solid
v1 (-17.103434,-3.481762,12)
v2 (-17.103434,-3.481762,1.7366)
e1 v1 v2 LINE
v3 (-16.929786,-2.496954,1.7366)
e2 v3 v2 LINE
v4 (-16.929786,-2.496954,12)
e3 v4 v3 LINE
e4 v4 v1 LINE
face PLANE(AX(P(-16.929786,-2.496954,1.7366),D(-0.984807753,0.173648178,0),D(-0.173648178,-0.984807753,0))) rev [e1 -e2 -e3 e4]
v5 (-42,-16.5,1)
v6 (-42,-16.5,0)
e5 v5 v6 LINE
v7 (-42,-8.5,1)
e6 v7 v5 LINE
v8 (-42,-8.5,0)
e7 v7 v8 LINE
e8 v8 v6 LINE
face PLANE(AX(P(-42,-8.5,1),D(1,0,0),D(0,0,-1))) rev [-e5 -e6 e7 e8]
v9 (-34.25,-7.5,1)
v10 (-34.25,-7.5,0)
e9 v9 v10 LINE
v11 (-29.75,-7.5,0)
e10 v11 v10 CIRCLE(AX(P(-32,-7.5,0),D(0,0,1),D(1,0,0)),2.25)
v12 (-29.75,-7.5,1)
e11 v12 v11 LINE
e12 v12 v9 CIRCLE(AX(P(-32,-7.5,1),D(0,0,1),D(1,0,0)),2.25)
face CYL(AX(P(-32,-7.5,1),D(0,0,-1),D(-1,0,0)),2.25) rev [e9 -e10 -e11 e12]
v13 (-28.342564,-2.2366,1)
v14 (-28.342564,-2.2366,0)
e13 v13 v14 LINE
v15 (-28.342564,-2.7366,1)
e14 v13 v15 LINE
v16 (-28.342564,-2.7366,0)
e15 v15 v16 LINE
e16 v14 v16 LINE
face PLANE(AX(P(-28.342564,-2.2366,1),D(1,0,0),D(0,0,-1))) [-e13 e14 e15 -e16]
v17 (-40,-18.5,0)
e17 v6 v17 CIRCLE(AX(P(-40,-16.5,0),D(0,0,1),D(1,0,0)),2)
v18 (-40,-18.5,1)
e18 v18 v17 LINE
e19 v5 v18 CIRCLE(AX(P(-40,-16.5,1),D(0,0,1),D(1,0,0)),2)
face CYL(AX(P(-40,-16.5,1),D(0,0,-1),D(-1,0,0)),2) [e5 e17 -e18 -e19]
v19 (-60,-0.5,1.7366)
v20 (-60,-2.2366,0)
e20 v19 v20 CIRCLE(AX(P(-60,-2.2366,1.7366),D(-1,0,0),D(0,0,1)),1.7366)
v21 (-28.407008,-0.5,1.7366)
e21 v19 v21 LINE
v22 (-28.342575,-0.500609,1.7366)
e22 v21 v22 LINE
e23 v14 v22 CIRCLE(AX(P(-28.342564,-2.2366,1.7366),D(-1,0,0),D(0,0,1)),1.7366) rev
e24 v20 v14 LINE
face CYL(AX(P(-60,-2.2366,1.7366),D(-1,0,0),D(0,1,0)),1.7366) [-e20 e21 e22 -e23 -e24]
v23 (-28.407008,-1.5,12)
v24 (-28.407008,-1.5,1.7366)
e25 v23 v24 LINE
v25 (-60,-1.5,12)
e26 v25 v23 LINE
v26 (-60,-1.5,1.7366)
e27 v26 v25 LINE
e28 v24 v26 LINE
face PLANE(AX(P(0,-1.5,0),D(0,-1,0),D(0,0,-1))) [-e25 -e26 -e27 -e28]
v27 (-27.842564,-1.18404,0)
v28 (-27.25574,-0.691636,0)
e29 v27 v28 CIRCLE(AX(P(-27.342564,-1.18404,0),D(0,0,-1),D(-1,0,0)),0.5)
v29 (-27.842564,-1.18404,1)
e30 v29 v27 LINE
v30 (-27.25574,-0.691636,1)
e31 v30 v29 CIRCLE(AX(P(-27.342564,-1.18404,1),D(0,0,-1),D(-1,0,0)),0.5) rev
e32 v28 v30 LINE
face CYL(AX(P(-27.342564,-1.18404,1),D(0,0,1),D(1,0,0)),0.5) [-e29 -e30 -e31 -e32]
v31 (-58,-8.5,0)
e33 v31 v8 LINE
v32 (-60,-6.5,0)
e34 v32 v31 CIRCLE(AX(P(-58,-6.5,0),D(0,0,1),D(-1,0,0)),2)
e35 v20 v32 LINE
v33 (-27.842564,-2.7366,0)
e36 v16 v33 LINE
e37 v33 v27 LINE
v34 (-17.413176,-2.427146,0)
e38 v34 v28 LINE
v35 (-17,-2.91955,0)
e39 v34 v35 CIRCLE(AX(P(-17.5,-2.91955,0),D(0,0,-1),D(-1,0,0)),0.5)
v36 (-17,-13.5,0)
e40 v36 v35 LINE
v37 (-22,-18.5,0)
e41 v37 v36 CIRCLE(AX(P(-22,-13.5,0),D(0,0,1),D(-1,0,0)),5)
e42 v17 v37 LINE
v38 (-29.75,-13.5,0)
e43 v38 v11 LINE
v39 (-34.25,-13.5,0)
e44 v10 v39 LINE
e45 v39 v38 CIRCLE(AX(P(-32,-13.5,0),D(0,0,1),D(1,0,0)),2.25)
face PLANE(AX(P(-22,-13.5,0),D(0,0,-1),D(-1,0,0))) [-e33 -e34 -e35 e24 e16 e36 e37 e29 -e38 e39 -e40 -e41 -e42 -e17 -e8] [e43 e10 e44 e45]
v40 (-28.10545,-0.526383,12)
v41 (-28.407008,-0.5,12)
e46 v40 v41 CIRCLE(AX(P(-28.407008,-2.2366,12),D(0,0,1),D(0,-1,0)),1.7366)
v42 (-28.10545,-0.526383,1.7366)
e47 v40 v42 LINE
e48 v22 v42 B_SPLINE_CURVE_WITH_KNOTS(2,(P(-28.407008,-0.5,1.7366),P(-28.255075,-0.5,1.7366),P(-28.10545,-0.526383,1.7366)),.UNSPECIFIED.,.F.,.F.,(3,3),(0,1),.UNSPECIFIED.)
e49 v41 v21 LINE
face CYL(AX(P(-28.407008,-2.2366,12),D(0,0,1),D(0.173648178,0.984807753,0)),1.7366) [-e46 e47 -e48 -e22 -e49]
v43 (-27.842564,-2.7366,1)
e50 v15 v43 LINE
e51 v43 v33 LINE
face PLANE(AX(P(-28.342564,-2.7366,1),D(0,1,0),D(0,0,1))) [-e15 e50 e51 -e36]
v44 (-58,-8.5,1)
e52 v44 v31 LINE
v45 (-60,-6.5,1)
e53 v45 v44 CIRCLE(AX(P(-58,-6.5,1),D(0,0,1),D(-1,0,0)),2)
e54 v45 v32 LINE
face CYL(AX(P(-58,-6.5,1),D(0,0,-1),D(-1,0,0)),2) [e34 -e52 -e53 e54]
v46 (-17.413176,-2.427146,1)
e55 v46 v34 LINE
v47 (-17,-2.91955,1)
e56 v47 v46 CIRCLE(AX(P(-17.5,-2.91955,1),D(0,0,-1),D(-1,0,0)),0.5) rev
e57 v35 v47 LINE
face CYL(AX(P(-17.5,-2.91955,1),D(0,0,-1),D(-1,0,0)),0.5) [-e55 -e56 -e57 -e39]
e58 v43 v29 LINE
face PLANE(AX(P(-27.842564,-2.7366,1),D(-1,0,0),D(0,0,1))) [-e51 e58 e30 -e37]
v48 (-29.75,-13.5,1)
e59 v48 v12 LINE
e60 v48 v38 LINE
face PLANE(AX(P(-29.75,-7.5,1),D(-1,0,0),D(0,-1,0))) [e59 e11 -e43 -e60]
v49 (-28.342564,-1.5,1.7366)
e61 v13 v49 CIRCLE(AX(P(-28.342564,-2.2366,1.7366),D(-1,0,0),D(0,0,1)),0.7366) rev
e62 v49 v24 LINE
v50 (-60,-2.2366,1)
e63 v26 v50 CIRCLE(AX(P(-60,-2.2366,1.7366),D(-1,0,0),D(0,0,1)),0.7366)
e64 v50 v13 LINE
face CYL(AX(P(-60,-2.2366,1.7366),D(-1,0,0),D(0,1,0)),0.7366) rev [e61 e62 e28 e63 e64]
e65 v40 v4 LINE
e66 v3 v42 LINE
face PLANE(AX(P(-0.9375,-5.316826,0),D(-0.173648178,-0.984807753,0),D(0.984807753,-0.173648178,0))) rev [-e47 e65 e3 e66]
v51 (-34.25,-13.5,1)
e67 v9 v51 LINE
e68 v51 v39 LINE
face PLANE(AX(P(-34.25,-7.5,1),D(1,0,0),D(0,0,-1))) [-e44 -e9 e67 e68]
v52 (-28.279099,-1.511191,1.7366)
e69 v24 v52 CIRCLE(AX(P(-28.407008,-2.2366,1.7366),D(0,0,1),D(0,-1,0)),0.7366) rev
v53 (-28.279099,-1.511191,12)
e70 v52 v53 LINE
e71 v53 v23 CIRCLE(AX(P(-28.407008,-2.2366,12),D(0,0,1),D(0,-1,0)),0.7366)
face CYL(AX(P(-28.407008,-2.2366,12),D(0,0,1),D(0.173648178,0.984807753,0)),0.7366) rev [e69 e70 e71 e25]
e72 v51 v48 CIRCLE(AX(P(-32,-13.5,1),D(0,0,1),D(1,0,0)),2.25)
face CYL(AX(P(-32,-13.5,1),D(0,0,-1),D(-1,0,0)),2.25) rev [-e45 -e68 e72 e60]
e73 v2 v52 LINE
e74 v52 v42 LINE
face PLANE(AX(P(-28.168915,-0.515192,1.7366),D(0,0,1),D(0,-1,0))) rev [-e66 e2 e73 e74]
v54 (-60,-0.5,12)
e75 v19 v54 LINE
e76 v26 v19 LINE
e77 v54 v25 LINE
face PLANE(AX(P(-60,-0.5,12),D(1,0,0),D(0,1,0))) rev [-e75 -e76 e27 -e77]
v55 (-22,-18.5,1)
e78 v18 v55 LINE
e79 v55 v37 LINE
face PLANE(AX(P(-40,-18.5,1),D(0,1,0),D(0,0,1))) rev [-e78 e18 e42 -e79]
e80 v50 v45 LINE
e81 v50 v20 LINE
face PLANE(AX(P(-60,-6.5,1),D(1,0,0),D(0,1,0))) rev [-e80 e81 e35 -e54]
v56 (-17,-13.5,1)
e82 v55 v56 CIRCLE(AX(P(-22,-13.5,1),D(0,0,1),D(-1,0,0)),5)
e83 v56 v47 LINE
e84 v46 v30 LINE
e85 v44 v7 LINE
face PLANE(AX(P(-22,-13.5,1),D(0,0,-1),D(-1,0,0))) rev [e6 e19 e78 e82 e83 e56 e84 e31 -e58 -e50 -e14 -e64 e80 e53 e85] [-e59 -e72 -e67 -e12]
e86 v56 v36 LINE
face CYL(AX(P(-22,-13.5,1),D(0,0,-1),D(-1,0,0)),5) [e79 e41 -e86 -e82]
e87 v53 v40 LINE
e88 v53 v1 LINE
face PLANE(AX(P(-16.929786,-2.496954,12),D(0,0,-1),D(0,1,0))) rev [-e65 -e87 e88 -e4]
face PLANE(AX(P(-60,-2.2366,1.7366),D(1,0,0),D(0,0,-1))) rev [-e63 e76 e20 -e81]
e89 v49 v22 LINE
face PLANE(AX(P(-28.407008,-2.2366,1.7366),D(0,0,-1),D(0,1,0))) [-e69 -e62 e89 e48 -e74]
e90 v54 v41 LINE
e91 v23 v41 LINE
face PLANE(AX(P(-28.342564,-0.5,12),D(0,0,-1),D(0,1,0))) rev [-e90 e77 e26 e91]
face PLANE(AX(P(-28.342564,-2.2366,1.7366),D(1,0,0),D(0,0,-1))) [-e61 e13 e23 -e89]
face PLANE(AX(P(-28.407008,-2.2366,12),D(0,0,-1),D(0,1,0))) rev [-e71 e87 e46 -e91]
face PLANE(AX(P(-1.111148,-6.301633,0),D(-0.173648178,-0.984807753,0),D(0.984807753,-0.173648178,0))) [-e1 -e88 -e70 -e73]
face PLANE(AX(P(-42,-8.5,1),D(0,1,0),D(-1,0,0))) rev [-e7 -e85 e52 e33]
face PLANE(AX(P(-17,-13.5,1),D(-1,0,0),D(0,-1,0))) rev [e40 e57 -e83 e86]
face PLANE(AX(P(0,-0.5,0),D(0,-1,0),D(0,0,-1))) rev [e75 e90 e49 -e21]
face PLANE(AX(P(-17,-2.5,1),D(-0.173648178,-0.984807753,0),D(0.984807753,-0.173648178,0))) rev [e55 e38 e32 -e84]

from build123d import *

# Parameters (mm, degrees)
BASIS_BLECH1_DEPTH             = 1
KANTE_LASCHE1_STRIP_W          = 5.4732
KANTE_LASCHE1_STRIP_H          = 1
KANTE_LASCHE1_STRIP_CUT_DEPTH  = 31.657436361
KANTE_LASCHE1_RELIEF_W         = 5.9732
KANTE_LASCHE1_RELIEF_H         = 0.5
KANTE_LASCHE1_RELIEF_CUT_DEPTH = 1
KANTE_LASCHE1_DEPTH            = 31.657436361
KANTE_LASCHE2_STRIP_CUT_DEPTH  = 10.2634
KANTE_LASCHE2_DEPTH            = 10.2634
VERRUNDUNG1_R                  = 0.5


# Sheet-metal steps are written as plain solids
with BuildPart() as part:
    # Skizze1 → Basis-Blech1 (new body)
    with BuildSketch(Plane.XY):
        with BuildLine():
            Line((-42, -8.5), (-42, -16.5))
            ThreePointArc((-42, -16.5), (-41.414213562, -17.914213562), (-40, -18.5))
            Line((-40, -18.5), (-22, -18.5))
            ThreePointArc((-22, -18.5), (-18.464466094, -17.035533906), (-17, -13.5))
            Line((-17, -13.5), (-17, -2.5))
            Line((-17, -2.5), (-28.342563639, -0.5))
            Line((-28.342563639, -0.5), (-60, -0.5))
            Line((-60, -0.5), (-60, -6.5))
            ThreePointArc((-60, -6.5), (-59.414213562, -7.914213562), (-58, -8.5))
            Line((-58, -8.5), (-42, -8.5))
        make_face()
        with BuildLine():
            Line((-29.75, -7.5), (-29.75, -13.5))
            ThreePointArc((-29.75, -13.5), (-32, -15.75), (-34.25, -13.5))
            Line((-34.25, -13.5), (-34.25, -7.5))
            ThreePointArc((-34.25, -7.5), (-32, -5.25), (-29.75, -7.5))
        make_face(mode=Mode.SUBTRACT)
    extrude(amount=BASIS_BLECH1_DEPTH)

    # Kante-Lasche1 strip (across the edge) → Kante-Lasche1 strip cut (cut)
    with BuildSketch(Plane(origin=(-28.342563639, -0.5, 1), x_dir=(0, -1, 0), z_dir=(-1, 0, 0))):
        with Locations((-1, -0.5)):
            Rectangle(KANTE_LASCHE1_STRIP_W, KANTE_LASCHE1_STRIP_H)
    extrude(amount=KANTE_LASCHE1_STRIP_CUT_DEPTH, mode=Mode.SUBTRACT)

    # Kante-Lasche1 relief (on the sheet) → Kante-Lasche1 relief cut (cut)
    with BuildSketch(Plane(origin=(-28.342563639, -2.2366, 1), x_dir=(0, -1, 0), z_dir=(0, 0, 1))):
        with Locations((-2.4866, 0.25)):
            Rectangle(KANTE_LASCHE1_RELIEF_W, KANTE_LASCHE1_RELIEF_H)
    extrude(amount=-KANTE_LASCHE1_RELIEF_CUT_DEPTH, mode=Mode.SUBTRACT)

    # Kante-Lasche1 section (across the edge) → Kante-Lasche1 (add)
    with BuildSketch(Plane(origin=(-28.342563639, -0.5, 1), x_dir=(0, -1, 0), z_dir=(-1, 0, 0))):
        with BuildLine():
            Line((0, 0.7366), (0, 11))
            Line((0, 11), (1, 11))
            Line((1, 11), (1, 0.7366))
            ThreePointArc((1, 0.7366), (1.215745145, 0.215745145), (1.7366, 0))
            Line((1.7366, 0), (1.7366, -1))
            ThreePointArc((1.7366, -1), (0.508638364, -0.491361636), (0, 0.7366))
        make_face()
    extrude(amount=KANTE_LASCHE1_DEPTH)

    # Kante-Lasche2 strip (across the edge) → Kante-Lasche2 strip cut (cut)
    with BuildSketch(Plane(origin=(-28.342563639, -1.5, 1.7366), x_dir=(-0.1736481776669236, -0.9848077530122092, 3.3156835934820577e-15), z_dir=(0, 0, 1))):
        Polygon((-1.92402835, 5.152936518), (-0.973617144, -0.237113276), (0.011190609, -0.063465098), (-0.939220597, 5.326584696), align=None)
    extrude(amount=KANTE_LASCHE2_STRIP_CUT_DEPTH, mode=Mode.SUBTRACT)

    # Kante-Lasche2 section (across the edge) → Kante-Lasche2 (add)
    with BuildSketch(Plane(origin=(-28.342563639, -1.5, 1.7366), x_dir=(-0.1736481776669236, -0.9848077530122092, 3.3156835934820577e-15), z_dir=(0, 0, 1))):
        with BuildLine():
            Line((-1, 0.06444415), (-1, 11.412511336))
            Line((-1, 11.412511336), (0, 11.412511336))
            Line((0, 11.412511336), (0, 0.06444415))
            ThreePointArc((0, 0.06444415), (0.002802985, 0.000245229), (0.011190609, -0.063465098))
            Line((0.011190609, -0.063465098), (-0.973617144, -0.237113276))
            ThreePointArc((-0.973617144, -0.237113276), (-0.993391713, -0.086910513), (-1, 0.06444415))
        make_face()
    extrude(amount=KANTE_LASCHE2_DEPTH)

    # Verrundung1
    verrundung1_edges = [part.edges().sort_by_distance(p)[0] for p in [
        (-17, -2.5, 0.5),
        (-27.842563639, -0.58816349, 0.5),
    ]]
    fillet(verrundung1_edges, radius=VERRUNDUNG1_R)


solid = part.part
